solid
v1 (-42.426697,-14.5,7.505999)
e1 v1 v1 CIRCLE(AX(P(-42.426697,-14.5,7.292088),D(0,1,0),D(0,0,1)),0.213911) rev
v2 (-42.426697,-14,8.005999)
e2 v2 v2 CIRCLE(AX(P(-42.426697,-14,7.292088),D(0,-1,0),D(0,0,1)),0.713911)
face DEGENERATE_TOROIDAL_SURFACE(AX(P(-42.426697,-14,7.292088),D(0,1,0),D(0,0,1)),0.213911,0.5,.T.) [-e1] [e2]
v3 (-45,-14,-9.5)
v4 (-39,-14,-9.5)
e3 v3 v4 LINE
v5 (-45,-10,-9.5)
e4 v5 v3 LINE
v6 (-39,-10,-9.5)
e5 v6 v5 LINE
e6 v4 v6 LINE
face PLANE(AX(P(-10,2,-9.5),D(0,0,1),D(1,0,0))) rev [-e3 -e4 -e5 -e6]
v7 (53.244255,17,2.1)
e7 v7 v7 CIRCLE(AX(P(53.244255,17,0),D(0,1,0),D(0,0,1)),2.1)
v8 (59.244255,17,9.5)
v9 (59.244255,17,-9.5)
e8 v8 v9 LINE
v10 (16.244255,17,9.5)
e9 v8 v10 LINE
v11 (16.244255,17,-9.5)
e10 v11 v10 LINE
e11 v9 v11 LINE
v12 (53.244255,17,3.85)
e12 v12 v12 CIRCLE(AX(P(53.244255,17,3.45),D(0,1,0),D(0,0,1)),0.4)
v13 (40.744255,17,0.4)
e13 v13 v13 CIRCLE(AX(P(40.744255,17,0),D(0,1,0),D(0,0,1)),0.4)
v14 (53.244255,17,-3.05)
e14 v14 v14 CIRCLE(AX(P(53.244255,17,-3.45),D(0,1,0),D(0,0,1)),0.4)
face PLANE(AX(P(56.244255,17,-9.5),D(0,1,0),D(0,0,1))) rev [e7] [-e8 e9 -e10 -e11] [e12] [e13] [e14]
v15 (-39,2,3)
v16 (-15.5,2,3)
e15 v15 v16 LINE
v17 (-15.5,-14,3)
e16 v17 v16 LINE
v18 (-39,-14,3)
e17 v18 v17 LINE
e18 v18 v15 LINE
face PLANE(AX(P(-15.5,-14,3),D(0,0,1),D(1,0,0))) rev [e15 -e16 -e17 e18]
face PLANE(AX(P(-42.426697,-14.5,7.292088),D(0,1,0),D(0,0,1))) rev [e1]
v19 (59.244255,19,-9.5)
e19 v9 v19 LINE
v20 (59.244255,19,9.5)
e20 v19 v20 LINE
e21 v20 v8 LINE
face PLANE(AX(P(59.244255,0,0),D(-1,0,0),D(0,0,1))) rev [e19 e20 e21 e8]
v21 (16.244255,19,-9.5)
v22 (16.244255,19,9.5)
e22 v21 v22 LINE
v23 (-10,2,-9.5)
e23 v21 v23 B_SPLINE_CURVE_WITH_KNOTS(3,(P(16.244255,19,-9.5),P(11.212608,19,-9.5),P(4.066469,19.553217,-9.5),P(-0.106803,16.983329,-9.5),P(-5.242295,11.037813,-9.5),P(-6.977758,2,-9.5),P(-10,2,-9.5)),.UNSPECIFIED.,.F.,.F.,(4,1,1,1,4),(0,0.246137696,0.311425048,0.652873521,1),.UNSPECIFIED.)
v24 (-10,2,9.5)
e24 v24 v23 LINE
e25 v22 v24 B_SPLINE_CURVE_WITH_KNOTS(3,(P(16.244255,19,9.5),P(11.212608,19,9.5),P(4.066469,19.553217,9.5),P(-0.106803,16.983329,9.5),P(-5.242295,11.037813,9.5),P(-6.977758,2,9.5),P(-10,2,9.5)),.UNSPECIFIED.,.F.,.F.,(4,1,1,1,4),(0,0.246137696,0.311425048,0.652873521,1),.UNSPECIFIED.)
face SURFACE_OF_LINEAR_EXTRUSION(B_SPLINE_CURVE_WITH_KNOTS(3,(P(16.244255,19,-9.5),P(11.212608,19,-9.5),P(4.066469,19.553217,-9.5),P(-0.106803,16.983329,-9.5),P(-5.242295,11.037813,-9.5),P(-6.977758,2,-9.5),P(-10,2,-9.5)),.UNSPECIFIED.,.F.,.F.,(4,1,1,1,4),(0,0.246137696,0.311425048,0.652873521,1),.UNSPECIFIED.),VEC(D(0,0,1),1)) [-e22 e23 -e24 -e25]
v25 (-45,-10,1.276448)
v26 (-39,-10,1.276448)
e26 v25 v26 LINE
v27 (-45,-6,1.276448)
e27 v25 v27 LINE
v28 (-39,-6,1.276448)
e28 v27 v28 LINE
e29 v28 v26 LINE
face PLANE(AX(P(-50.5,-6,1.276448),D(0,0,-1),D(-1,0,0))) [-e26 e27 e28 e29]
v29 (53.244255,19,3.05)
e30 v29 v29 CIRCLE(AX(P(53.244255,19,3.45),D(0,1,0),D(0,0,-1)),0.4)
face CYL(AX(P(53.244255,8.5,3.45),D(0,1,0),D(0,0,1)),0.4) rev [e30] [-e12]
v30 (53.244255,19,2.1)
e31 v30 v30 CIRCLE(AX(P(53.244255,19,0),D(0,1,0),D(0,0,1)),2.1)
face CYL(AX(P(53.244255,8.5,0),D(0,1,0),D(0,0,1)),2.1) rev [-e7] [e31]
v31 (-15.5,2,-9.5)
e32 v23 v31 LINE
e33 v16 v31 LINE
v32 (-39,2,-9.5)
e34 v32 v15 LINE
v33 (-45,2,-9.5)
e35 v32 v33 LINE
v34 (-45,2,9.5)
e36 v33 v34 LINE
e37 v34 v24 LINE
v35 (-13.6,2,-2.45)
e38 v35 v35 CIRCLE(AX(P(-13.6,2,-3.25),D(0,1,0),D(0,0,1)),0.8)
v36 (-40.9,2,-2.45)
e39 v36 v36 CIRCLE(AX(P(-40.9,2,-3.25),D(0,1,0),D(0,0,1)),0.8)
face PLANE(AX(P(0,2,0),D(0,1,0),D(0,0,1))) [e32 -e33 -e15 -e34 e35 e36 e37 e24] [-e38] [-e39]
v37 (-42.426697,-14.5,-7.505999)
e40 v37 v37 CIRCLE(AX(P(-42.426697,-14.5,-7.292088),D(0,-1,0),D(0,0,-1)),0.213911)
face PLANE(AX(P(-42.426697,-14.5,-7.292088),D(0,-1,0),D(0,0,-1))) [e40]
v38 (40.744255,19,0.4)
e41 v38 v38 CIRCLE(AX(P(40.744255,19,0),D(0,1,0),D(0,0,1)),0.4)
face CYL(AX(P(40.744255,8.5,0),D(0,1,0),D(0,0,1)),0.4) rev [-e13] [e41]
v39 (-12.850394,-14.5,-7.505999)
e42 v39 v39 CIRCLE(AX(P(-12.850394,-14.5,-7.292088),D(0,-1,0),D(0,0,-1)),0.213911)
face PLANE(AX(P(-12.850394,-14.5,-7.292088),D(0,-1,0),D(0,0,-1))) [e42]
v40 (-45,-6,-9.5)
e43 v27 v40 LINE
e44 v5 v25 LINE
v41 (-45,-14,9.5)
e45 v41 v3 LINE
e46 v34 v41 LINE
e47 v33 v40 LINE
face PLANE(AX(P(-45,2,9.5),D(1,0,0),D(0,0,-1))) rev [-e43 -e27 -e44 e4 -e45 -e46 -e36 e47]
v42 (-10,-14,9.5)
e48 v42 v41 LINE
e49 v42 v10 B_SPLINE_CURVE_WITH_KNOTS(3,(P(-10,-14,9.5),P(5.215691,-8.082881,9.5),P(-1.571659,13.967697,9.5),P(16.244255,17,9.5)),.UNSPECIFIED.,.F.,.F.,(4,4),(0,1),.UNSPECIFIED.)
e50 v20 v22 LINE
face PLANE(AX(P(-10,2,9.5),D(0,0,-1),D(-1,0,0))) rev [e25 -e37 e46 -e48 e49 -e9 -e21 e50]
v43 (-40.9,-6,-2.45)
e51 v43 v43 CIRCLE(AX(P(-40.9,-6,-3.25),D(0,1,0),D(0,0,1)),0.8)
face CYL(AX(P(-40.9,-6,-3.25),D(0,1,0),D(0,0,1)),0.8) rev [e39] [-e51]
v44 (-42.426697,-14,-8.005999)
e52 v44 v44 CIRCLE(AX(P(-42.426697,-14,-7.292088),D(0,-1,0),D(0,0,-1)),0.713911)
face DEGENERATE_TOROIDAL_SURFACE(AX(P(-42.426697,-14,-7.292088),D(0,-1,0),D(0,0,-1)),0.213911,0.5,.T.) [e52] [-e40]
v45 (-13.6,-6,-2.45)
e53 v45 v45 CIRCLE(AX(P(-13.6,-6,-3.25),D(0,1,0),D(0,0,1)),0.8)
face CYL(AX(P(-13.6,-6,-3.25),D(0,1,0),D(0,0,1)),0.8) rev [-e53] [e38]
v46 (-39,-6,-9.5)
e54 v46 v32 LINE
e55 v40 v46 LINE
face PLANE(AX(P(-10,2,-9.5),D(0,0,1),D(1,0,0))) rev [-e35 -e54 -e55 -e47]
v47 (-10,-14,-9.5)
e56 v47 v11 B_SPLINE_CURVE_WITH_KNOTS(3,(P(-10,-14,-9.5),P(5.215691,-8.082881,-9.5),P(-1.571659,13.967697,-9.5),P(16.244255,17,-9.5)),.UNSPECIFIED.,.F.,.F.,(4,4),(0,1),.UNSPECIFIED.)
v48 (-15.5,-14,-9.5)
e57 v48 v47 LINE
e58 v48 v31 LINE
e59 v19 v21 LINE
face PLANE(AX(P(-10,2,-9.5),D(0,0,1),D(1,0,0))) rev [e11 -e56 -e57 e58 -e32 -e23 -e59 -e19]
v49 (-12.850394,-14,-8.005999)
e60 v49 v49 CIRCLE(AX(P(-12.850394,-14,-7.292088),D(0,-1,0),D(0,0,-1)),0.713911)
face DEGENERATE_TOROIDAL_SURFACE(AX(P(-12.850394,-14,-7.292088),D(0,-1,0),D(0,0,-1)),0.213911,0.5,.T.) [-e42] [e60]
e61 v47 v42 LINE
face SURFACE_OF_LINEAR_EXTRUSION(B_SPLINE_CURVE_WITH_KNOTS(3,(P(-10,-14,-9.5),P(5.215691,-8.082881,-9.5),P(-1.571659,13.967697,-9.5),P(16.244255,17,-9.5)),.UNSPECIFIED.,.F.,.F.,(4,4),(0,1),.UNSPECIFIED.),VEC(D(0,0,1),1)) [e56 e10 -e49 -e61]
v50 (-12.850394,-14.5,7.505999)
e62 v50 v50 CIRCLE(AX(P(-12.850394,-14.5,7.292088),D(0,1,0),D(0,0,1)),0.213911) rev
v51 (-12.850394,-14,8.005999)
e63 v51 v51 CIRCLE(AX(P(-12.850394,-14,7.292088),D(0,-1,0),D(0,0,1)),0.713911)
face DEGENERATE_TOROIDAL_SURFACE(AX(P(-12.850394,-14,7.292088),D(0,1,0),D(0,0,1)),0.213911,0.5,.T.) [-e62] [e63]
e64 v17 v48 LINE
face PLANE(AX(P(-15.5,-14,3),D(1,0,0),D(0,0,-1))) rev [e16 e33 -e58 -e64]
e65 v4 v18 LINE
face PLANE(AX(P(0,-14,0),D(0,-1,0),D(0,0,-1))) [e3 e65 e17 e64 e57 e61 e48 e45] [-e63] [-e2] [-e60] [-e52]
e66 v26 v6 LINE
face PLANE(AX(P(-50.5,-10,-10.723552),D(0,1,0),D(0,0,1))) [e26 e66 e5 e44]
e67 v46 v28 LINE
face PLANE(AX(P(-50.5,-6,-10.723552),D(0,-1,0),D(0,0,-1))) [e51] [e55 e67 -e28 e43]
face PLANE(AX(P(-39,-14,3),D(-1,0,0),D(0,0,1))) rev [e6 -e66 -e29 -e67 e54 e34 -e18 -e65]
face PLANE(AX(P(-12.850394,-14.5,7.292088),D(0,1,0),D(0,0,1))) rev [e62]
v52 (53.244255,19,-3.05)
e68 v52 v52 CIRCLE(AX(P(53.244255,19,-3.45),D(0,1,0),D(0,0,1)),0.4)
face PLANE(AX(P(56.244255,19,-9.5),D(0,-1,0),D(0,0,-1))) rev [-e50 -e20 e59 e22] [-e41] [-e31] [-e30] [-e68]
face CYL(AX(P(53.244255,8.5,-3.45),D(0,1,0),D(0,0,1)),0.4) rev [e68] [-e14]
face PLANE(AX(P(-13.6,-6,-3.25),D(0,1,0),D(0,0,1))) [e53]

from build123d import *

# Parameters (mm, degrees)
SKETCH1_W            = 35
SKETCH1_H            = 19
BOSS_EXTRUDE1_DEPTH  = 2
SKETCH2_W            = 35
SKETCH2_H            = 19
BOSS_EXTRUDE2_DEPTH  = 14
SKETCH5_W            = 23.5
SKETCH5_H            = 12.5
CUT_EXTRUDE1_DEPTH   = 16
SKETCH6_W            = 12
SKETCH6_H            = 4
CUT_EXTRUDE2_DEPTH   = 35
BOSS_EXTRUDE7_DEPTH  = 19
SKETCH17_W           = 19
SKETCH17_H           = 2
BOSS_EXTRUDE8_DEPTH  = 40
SKETCH10_R           = 0.713910761
BOSS_EXTRUDE9_DEPTH  = 0.5
FILLET2_R            = 0.5
SKETCH18_R           = 0.4
CUT_EXTRUDE6_DEPTH   = 10.5
SKETCH19_R           = 2.1
CUT_EXTRUDE7_DEPTH   = 10.5
SKETCH20_W           = 19
SKETCH20_H           = 2
BOSS_EXTRUDE10_DEPTH = 3
SKETCH7_R            = 0.8
CUT_EXTRUDE8_DEPTH   = 8


with BuildPart() as part:
    # Sketch1 → Boss-Extrude1 (new body)
    with BuildSketch(Plane(origin=(0, 0, 0), x_dir=(1, 0, 0), z_dir=(0, 1, 0))):
        with Locations((-27.5, 0)):
            Rectangle(SKETCH1_W, SKETCH1_H)
    extrude(amount=BOSS_EXTRUDE1_DEPTH)

    # Sketch2 → Boss-Extrude2 (add)
    with BuildSketch(Plane(origin=(0, 0, 0), x_dir=(-1, 0, 0), z_dir=(0, -1, 0))):
        with Locations((27.5, 0)):
            Rectangle(SKETCH2_W, SKETCH2_H)
    extrude(amount=BOSS_EXTRUDE2_DEPTH)

    # Sketch5 → Cut-Extrude1 (cut)
    with BuildSketch(Plane(origin=(0, 2, 0), x_dir=(1, 0, 0), z_dir=(0, 1, 0))):
        with Locations((-27.25, 3.25)):
            Rectangle(SKETCH5_W, SKETCH5_H)
    extrude(amount=-CUT_EXTRUDE1_DEPTH, mode=Mode.SUBTRACT)

    # Sketch6 → Cut-Extrude2 (cut)
    with BuildSketch(Plane.ZY.offset(15.5)):
        with Locations((-4.723551551, -8)):
            Rectangle(SKETCH6_W, SKETCH6_H)
    extrude(amount=CUT_EXTRUDE2_DEPTH, mode=Mode.SUBTRACT)

    # Sketch15 → Boss-Extrude7 (add)
    with BuildSketch(Plane.XY.offset(9.5)):
        with BuildLine():
            Line((16.244255375, 17), (16.244255375, 19))
            add(Edge.make_bspline(
                [(16.244255375, 19), (11.212607589, 19), (4.066469068, 19.553217376), (-0.106803104, 16.983328742), (-5.242294622, 11.037813369), (-6.977758039, 2), (-10, 2)],
                knots=[0, 0, 0, 0, 0.246137696, 0.311425048, 0.652873521, 1, 1, 1, 1], degree=3))
            Line((-10, 2), (-10, -14))
            add(Edge.make_bspline(
                [(-10, -14), (5.215691354, -8.082881299), (-1.571658903, 13.967697147), (16.244255375, 17)],
                knots=[0, 0, 0, 0, 1, 1, 1, 1], degree=3))
        make_face()
    extrude(amount=-BOSS_EXTRUDE7_DEPTH)

    # Sketch17 → Boss-Extrude8 (add)
    with BuildSketch(Plane(origin=(16.244255375, 0, 0), x_dir=(0, 0, -1), z_dir=(1, 0, 0))):
        with Locations((0, 18)):
            Rectangle(SKETCH17_W, SKETCH17_H)
    extrude(amount=BOSS_EXTRUDE8_DEPTH)

    # Sketch10 → Boss-Extrude9 (add)
    with BuildSketch(Plane(origin=(0, -14, 0), x_dir=(-1, 0, 0), z_dir=(0, -1, 0))):
        with Locations(Location((42.426696663, 7.292088489, 0), (0, 0, 90))):
            Circle(SKETCH10_R)
        with Locations(Location((12.850393701, 7.292088489, 0), (0, 0, 90))):
            Circle(SKETCH10_R)
        with Locations(Location((12.850393701, -7.292088489, 0), (0, 0, 270))):
            Circle(SKETCH10_R)
        with Locations(Location((42.426696663, -7.292088489, 0), (0, 0, 270))):
            Circle(SKETCH10_R)
    extrude(amount=BOSS_EXTRUDE9_DEPTH)

    # Fillet2
    fillet2_edges = [part.edges().sort_by_distance(p)[0] for p in [
        (-12.850393701, -14.5, 6.578177728),
        (-42.426696663, -14.5, 6.578177728),
        (-42.426696663, -14.5, -6.578177728),
        (-12.850393701, -14.5, -6.578177728),
    ]]
    fillet(fillet2_edges, radius=FILLET2_R - 0.0001)  # a hair under: the kernel refuses the full size

    # Sketch18 → Cut-Extrude6 (cut)
    with BuildSketch(Plane(origin=(0, 19, 0), x_dir=(1, 0, 0), z_dir=(0, 1, 0))):
        with Locations(Location((53.244255375, 3.45, 0), (0, 0, 270))):
            Circle(SKETCH18_R)
        with Locations(Location((53.244255375, -3.45, 0), (0, 0, 270))):
            Circle(SKETCH18_R)
        with Locations((50.214832051, 25.851748831)):
            Circle(SKETCH18_R)
        with Locations(Location((40.744255375, 0, 0), (0, 0, 270))):
            Circle(SKETCH18_R)
    extrude(amount=-CUT_EXTRUDE6_DEPTH, mode=Mode.SUBTRACT)

    # Sketch19 → Cut-Extrude7 (cut)
    with BuildSketch(Plane(origin=(0, 19, 0), x_dir=(1, 0, 0), z_dir=(0, 1, 0))):
        with Locations(Location((53.244255375, 0, 0), (0, 0, 270))):
            Circle(SKETCH19_R)
    extrude(amount=-CUT_EXTRUDE7_DEPTH, mode=Mode.SUBTRACT)

    # Sketch20 → Boss-Extrude10 (add)
    with BuildSketch(Plane(origin=(56.244255375, 0, 0), x_dir=(0, 0, -1), z_dir=(1, 0, 0))):
        with Locations((0, 18)):
            Rectangle(SKETCH20_W, SKETCH20_H)
    extrude(amount=BOSS_EXTRUDE10_DEPTH)

    # Sketch7 → Cut-Extrude8 (cut)
    with BuildSketch(Plane(origin=(0, 2, 0), x_dir=(1, 0, 0), z_dir=(0, 1, 0))):
        with Locations(Location((-40.9, 3.25, 0), (0, 0, 270))):
            Circle(SKETCH7_R)
        with Locations(Location((-13.6, 3.25, 0), (0, 0, 270))):
            Circle(SKETCH7_R)
    extrude(amount=-CUT_EXTRUDE8_DEPTH, mode=Mode.SUBTRACT)


solid = part.part
